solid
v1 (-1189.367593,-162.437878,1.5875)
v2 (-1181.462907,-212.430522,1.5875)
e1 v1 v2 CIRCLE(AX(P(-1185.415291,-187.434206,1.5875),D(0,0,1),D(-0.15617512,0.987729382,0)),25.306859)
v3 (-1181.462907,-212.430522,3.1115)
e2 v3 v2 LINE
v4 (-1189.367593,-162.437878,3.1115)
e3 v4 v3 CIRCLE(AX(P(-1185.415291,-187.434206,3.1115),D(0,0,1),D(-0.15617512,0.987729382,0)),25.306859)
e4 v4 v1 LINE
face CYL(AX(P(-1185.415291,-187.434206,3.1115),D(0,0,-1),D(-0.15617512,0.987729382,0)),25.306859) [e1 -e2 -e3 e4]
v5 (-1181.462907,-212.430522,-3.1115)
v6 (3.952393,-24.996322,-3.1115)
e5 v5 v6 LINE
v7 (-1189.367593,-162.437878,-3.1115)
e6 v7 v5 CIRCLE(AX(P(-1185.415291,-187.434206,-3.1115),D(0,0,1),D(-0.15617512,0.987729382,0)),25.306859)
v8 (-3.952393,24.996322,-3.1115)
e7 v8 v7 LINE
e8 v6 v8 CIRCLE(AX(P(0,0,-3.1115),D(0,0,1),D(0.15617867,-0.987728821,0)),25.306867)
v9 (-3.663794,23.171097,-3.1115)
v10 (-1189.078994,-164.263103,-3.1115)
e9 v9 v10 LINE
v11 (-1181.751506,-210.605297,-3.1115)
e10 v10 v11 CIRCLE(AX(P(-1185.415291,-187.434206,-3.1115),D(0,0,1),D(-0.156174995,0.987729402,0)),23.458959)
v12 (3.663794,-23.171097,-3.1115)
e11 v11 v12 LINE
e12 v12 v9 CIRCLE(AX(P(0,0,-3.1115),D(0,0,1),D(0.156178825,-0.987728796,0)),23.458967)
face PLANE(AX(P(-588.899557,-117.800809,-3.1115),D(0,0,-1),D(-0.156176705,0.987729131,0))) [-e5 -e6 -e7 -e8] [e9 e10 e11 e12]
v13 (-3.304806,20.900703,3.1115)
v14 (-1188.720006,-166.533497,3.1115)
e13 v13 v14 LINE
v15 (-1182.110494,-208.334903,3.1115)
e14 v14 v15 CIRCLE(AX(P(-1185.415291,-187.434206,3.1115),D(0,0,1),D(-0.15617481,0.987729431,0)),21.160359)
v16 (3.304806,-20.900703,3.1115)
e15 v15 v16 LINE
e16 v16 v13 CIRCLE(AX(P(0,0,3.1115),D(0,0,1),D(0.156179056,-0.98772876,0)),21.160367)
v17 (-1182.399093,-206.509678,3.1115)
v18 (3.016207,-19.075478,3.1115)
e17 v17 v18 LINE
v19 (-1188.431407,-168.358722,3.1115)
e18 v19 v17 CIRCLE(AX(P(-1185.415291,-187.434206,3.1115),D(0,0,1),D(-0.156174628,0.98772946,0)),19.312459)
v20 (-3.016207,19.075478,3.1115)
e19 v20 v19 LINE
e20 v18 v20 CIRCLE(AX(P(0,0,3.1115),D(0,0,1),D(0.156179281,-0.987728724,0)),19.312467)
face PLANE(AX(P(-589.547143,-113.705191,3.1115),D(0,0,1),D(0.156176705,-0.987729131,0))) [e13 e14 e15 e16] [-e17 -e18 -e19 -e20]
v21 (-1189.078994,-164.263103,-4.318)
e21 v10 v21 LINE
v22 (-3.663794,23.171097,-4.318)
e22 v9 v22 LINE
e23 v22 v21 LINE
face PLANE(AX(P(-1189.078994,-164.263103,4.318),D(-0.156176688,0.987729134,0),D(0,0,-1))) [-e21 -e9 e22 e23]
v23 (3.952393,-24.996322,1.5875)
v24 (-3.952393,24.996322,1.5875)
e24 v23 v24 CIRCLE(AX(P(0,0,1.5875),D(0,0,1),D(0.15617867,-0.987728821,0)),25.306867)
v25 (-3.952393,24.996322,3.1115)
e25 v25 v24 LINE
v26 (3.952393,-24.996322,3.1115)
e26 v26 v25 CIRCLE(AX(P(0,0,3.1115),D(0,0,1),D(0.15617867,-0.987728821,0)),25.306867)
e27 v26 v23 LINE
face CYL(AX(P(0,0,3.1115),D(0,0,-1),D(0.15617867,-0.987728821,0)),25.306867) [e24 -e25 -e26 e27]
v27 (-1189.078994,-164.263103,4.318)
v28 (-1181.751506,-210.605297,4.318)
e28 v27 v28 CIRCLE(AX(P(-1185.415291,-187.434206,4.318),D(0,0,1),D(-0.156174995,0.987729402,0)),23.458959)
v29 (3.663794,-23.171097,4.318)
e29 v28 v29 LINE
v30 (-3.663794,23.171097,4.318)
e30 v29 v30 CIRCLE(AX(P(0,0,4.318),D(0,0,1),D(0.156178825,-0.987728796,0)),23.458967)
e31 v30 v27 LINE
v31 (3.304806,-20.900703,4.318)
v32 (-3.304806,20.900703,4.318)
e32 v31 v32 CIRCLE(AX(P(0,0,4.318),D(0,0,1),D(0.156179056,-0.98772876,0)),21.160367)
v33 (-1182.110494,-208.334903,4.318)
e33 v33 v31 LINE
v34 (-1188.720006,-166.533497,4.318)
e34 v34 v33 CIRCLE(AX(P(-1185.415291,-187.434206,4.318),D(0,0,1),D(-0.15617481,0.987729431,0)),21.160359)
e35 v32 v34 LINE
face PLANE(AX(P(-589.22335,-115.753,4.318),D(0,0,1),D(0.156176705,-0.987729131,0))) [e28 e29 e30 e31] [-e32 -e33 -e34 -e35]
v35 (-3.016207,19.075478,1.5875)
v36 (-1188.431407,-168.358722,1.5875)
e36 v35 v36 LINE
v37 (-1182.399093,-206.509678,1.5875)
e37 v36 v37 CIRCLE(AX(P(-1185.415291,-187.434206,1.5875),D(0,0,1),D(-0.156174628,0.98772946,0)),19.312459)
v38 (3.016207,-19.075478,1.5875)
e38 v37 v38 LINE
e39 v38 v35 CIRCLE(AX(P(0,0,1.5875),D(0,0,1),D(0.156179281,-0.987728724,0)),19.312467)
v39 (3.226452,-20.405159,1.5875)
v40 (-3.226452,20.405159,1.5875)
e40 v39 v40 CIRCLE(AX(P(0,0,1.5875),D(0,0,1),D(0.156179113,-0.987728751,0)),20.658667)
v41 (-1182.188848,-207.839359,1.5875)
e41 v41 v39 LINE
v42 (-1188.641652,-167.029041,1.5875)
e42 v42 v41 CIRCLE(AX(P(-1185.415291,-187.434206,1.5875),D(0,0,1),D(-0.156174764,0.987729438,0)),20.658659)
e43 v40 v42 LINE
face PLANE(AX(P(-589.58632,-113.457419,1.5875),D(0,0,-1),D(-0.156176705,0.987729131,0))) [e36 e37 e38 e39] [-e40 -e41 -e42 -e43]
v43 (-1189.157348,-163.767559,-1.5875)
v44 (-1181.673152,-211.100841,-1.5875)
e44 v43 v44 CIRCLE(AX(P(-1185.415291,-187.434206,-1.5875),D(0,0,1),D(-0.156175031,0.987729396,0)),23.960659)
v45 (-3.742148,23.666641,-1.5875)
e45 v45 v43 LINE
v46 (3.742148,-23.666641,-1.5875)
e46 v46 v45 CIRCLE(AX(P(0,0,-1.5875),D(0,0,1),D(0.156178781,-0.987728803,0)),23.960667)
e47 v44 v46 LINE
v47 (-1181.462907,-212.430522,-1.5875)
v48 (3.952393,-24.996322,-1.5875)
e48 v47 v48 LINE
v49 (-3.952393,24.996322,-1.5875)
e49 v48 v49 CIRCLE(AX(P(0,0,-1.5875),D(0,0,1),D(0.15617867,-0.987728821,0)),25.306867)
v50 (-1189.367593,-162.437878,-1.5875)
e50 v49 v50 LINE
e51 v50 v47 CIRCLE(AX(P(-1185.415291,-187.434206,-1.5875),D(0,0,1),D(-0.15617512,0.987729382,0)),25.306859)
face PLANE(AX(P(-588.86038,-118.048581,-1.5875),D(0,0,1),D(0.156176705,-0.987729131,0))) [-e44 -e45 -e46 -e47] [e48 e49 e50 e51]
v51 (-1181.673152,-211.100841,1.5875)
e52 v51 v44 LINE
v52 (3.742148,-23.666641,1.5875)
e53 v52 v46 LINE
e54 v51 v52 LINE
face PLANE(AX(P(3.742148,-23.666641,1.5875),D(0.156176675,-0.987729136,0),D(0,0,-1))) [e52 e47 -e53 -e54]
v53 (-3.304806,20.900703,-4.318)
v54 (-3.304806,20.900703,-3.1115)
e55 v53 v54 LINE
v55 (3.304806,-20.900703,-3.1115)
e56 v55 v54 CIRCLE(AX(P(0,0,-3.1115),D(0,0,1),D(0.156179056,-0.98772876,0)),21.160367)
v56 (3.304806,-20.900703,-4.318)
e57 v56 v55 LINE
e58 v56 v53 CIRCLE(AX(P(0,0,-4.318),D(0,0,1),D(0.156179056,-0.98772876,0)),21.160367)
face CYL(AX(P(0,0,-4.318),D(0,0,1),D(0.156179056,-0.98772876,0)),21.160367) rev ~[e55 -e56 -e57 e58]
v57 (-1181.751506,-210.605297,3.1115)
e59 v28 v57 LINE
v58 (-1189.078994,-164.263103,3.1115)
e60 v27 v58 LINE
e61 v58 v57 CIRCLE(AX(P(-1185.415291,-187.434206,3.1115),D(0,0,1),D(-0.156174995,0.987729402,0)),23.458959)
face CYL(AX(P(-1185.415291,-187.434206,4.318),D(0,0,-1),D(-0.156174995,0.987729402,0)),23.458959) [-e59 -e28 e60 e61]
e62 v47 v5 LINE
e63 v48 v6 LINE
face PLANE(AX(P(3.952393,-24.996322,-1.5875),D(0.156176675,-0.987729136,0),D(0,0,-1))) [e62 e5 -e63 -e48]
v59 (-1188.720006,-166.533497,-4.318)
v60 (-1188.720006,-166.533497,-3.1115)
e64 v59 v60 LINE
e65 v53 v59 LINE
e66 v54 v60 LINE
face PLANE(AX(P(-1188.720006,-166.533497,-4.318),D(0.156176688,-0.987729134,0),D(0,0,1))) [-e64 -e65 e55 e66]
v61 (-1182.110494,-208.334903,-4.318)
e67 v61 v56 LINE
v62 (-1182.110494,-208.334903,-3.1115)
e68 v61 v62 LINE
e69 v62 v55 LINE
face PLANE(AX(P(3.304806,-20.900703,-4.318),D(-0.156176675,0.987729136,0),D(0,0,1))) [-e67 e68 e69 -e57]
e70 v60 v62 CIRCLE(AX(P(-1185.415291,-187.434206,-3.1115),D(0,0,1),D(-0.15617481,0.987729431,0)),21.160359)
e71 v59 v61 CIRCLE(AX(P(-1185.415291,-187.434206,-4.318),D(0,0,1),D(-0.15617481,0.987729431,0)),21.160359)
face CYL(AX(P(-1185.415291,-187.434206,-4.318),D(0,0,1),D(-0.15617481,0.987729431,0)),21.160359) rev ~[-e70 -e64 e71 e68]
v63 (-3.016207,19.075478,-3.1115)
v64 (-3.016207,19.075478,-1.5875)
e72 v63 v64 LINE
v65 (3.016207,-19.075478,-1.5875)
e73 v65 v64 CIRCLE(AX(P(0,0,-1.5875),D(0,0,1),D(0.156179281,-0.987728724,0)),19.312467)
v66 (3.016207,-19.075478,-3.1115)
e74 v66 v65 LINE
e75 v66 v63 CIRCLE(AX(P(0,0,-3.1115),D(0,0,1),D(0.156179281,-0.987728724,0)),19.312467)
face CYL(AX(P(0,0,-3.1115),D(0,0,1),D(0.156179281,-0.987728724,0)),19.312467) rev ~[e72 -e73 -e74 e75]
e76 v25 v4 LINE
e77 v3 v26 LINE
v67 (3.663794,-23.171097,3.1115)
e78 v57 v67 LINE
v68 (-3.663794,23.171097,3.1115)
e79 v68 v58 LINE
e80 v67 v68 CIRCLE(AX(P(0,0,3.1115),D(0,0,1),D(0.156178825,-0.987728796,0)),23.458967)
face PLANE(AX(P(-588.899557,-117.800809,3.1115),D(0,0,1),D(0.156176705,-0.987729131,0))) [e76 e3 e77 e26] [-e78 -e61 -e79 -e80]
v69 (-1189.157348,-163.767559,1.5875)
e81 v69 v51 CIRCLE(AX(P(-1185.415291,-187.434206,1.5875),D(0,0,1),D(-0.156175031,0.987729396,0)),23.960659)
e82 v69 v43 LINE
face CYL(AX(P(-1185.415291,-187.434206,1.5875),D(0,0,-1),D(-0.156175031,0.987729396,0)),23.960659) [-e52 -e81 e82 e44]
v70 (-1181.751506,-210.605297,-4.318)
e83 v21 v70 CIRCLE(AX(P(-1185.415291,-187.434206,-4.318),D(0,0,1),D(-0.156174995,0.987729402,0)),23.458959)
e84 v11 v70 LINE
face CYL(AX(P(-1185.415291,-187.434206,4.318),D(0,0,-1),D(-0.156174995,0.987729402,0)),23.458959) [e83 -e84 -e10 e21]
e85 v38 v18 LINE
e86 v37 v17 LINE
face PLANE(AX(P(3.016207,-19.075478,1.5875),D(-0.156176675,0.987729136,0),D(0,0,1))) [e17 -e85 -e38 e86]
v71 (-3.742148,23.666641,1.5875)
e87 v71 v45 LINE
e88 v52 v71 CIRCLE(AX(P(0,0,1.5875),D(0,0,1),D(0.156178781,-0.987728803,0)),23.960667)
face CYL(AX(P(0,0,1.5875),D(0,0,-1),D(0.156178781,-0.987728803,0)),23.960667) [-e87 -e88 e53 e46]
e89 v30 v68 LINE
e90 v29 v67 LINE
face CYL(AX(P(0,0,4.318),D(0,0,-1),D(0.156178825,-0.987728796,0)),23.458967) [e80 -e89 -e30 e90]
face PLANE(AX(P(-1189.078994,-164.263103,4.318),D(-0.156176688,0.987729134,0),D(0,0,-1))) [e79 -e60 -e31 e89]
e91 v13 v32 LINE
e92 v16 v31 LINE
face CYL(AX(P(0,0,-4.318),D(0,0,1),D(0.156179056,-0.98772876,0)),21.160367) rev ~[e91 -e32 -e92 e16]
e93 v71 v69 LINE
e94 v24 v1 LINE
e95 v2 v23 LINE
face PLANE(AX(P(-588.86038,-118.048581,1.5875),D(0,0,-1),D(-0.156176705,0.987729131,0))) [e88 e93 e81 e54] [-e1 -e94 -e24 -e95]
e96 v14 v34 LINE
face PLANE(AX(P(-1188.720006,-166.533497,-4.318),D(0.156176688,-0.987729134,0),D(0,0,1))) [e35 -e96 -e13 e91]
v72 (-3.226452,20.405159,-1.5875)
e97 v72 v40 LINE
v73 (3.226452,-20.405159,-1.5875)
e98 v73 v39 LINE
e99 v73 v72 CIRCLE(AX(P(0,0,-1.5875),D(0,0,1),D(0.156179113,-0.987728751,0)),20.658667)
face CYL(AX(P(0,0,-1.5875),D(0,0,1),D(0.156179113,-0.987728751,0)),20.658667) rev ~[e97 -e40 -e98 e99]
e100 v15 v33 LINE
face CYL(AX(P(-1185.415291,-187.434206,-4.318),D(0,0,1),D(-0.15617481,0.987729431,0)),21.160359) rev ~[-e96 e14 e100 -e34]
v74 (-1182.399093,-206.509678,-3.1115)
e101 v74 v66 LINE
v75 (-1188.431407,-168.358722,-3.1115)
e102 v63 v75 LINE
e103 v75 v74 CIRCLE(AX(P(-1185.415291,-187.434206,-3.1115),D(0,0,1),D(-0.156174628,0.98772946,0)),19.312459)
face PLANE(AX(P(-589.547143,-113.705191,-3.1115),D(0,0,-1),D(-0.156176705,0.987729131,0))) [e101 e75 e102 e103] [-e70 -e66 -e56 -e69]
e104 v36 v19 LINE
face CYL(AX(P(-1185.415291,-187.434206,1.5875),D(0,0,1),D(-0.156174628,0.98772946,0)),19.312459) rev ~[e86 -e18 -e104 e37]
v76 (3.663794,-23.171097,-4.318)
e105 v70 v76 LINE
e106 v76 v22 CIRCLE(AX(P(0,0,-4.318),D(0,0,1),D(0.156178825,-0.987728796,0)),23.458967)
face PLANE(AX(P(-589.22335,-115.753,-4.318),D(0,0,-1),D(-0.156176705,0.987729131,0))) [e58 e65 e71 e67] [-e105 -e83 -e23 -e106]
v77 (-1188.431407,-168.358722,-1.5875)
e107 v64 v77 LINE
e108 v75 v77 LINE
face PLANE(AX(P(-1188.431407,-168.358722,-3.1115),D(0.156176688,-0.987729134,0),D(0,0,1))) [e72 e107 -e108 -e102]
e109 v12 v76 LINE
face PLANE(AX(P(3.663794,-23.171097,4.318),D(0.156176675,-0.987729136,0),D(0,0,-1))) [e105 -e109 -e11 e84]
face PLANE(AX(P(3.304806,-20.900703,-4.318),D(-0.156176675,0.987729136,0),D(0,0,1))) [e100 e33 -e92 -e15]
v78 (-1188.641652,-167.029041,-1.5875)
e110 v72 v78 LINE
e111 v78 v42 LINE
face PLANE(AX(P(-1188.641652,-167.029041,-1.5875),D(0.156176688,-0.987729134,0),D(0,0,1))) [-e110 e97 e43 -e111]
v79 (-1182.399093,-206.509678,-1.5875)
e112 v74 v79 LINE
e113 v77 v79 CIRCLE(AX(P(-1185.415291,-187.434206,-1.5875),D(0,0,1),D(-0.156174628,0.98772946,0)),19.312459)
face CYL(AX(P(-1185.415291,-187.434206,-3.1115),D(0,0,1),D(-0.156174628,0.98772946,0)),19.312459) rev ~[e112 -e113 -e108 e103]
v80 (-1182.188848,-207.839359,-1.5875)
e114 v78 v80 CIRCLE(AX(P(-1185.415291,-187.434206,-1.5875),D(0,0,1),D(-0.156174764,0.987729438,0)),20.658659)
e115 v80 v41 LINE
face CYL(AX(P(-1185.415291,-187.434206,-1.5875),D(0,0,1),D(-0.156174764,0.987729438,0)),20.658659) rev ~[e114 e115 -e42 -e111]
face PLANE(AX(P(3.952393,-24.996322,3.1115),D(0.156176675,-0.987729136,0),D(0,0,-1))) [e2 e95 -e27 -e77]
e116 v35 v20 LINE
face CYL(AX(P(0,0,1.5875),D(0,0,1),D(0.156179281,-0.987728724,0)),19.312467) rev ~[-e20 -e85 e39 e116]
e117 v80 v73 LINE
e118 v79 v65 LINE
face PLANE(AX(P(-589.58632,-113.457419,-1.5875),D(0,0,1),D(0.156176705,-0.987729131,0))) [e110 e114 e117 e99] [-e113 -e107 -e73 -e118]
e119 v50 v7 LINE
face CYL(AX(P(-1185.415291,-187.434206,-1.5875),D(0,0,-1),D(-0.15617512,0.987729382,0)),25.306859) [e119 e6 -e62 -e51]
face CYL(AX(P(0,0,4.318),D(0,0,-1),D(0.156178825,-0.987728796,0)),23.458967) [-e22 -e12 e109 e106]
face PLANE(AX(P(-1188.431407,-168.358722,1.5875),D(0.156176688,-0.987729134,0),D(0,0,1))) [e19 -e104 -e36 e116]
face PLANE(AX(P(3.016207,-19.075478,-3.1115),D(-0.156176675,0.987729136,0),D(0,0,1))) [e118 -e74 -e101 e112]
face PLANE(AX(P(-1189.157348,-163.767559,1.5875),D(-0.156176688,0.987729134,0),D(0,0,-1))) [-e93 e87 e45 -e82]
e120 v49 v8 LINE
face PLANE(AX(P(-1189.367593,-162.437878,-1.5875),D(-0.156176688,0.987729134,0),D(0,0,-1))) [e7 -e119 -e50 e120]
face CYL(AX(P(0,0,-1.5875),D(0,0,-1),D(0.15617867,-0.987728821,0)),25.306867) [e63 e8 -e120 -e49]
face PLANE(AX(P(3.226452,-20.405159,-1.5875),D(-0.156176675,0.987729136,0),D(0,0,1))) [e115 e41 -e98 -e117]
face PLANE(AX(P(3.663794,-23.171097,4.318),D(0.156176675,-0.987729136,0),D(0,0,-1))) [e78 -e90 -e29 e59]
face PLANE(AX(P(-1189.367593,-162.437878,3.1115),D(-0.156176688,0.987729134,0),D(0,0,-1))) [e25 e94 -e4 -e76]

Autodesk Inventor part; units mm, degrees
ref_plane "Work Plane2" through (0, 0, 0) normal (-1, 0, 0) x (0, 0, 1)
ref_plane "Work Plane3" through (-1185.4153, -187.4342, 0) normal (1, 0.0000001, 0) x (0, 0, 1)
sketch "Path" plane through (0, 0, 0) normal (0, 0, 1) x (1, 0, 0)
  arc A0 (3.4843, -22.0359) -> (-3.4843, 22.0359) centre (0, 0) ccw
  arc A1 (-1188.8995, -165.3983) -> (-1181.931, -209.4701) centre (-1185.4153, -187.4342) ccw
  line L0 (-1188.8995, -165.3983) -> (-3.4843, 22.0359)
  line L1 (3.4843, -22.0359) -> (-1181.931, -209.4701)
  dimension "d31" = 5.9944
ref_plane "Section Plane" through (-3.4843, 22.0359, 0) normal (-0.9877291, -0.1561767, 0) x (0, 0, 1)
sketch "Section Sketch" plane through (-3.4843, 22.0359, 0) normal (-0.9877291, -0.1561767, 0) x (0, 0, 1)
  line L0 (-4.318, -1.1493) -> (4.318, -1.1493)
  line L1 (4.318, -1.1493) -> (4.318, 1.1493)
  line L2 (4.318, 1.1493) -> (-4.318, 1.1493)
  line L3 (-4.318, 1.1493) -> (-4.318, -1.1493)
  line L4 (-1.5875, -1.651) -> (1.5875, -1.651)
  line L5 (1.5875, -1.651) -> (1.5875, 1.651)
  line L6 (1.5875, 1.651) -> (-1.5875, 1.651)
  line L7 (-1.5875, 1.651) -> (-1.5875, -1.651)
  line L8 (-1.5875, 0) -> (1.5875, 0) construction
  line L9 (-3.1115, -2.9972) -> (-1.5875, -2.9972)
  line L10 (-1.5875, -2.9972) -> (-1.5875, 2.9972)
  line L11 (-1.5875, 2.9972) -> (-3.1115, 2.9972)
  line L12 (-3.1115, 2.9972) -> (-3.1115, -2.9972)
  line L13 (1.5875, -2.9972) -> (3.1115, -2.9972)
  line L14 (3.1115, -2.9972) -> (3.1115, 2.9972)
  line L15 (3.1115, 2.9972) -> (1.5875, 2.9972)
  line L16 (1.5875, 2.9972) -> (1.5875, -2.9972)
  line L17 (-4.318, 0) -> (4.318, 0) construction
  point P0 (0, 0)
  point P1 (0, 0)
  dimension "d21" = 2.2987
  dimension "d22" = 3.302
  dimension "d23" = 3.175
  dimension "d24" = 1.524
  dimension "d31" = 5.9944
  dimension "d32" = 8.636
sweep "Solid" add profiles "Section Sketch" path "Path"
pattern_of_one "Strand Pattern"
equation "\"d21\" = da_d2"
equation "\"d22\" = da_d1"
equation "\"d23\" = da_b1"
equation "\"d24\" = da_t1 + da_t2"
equation "\"d30\" = da_pt"
equation "\"da_p\" = 6.35"
equation "\"da_b1\" = 3.175"
equation "\"da_h2\" = 5.9944"
equation "\"da_h3\" = 5.207"
equation "\"da_d1\" = 3.302"
equation "\"da_d2\" = 2.2987"
equation "\"da_pt\" = 6.4008"
equation "\"da_b\" = 8.636"
equation "\"da_t1\" = 0.762"
equation "\"da_t2\" = 0.762"
properties part number "Roller Chain"
